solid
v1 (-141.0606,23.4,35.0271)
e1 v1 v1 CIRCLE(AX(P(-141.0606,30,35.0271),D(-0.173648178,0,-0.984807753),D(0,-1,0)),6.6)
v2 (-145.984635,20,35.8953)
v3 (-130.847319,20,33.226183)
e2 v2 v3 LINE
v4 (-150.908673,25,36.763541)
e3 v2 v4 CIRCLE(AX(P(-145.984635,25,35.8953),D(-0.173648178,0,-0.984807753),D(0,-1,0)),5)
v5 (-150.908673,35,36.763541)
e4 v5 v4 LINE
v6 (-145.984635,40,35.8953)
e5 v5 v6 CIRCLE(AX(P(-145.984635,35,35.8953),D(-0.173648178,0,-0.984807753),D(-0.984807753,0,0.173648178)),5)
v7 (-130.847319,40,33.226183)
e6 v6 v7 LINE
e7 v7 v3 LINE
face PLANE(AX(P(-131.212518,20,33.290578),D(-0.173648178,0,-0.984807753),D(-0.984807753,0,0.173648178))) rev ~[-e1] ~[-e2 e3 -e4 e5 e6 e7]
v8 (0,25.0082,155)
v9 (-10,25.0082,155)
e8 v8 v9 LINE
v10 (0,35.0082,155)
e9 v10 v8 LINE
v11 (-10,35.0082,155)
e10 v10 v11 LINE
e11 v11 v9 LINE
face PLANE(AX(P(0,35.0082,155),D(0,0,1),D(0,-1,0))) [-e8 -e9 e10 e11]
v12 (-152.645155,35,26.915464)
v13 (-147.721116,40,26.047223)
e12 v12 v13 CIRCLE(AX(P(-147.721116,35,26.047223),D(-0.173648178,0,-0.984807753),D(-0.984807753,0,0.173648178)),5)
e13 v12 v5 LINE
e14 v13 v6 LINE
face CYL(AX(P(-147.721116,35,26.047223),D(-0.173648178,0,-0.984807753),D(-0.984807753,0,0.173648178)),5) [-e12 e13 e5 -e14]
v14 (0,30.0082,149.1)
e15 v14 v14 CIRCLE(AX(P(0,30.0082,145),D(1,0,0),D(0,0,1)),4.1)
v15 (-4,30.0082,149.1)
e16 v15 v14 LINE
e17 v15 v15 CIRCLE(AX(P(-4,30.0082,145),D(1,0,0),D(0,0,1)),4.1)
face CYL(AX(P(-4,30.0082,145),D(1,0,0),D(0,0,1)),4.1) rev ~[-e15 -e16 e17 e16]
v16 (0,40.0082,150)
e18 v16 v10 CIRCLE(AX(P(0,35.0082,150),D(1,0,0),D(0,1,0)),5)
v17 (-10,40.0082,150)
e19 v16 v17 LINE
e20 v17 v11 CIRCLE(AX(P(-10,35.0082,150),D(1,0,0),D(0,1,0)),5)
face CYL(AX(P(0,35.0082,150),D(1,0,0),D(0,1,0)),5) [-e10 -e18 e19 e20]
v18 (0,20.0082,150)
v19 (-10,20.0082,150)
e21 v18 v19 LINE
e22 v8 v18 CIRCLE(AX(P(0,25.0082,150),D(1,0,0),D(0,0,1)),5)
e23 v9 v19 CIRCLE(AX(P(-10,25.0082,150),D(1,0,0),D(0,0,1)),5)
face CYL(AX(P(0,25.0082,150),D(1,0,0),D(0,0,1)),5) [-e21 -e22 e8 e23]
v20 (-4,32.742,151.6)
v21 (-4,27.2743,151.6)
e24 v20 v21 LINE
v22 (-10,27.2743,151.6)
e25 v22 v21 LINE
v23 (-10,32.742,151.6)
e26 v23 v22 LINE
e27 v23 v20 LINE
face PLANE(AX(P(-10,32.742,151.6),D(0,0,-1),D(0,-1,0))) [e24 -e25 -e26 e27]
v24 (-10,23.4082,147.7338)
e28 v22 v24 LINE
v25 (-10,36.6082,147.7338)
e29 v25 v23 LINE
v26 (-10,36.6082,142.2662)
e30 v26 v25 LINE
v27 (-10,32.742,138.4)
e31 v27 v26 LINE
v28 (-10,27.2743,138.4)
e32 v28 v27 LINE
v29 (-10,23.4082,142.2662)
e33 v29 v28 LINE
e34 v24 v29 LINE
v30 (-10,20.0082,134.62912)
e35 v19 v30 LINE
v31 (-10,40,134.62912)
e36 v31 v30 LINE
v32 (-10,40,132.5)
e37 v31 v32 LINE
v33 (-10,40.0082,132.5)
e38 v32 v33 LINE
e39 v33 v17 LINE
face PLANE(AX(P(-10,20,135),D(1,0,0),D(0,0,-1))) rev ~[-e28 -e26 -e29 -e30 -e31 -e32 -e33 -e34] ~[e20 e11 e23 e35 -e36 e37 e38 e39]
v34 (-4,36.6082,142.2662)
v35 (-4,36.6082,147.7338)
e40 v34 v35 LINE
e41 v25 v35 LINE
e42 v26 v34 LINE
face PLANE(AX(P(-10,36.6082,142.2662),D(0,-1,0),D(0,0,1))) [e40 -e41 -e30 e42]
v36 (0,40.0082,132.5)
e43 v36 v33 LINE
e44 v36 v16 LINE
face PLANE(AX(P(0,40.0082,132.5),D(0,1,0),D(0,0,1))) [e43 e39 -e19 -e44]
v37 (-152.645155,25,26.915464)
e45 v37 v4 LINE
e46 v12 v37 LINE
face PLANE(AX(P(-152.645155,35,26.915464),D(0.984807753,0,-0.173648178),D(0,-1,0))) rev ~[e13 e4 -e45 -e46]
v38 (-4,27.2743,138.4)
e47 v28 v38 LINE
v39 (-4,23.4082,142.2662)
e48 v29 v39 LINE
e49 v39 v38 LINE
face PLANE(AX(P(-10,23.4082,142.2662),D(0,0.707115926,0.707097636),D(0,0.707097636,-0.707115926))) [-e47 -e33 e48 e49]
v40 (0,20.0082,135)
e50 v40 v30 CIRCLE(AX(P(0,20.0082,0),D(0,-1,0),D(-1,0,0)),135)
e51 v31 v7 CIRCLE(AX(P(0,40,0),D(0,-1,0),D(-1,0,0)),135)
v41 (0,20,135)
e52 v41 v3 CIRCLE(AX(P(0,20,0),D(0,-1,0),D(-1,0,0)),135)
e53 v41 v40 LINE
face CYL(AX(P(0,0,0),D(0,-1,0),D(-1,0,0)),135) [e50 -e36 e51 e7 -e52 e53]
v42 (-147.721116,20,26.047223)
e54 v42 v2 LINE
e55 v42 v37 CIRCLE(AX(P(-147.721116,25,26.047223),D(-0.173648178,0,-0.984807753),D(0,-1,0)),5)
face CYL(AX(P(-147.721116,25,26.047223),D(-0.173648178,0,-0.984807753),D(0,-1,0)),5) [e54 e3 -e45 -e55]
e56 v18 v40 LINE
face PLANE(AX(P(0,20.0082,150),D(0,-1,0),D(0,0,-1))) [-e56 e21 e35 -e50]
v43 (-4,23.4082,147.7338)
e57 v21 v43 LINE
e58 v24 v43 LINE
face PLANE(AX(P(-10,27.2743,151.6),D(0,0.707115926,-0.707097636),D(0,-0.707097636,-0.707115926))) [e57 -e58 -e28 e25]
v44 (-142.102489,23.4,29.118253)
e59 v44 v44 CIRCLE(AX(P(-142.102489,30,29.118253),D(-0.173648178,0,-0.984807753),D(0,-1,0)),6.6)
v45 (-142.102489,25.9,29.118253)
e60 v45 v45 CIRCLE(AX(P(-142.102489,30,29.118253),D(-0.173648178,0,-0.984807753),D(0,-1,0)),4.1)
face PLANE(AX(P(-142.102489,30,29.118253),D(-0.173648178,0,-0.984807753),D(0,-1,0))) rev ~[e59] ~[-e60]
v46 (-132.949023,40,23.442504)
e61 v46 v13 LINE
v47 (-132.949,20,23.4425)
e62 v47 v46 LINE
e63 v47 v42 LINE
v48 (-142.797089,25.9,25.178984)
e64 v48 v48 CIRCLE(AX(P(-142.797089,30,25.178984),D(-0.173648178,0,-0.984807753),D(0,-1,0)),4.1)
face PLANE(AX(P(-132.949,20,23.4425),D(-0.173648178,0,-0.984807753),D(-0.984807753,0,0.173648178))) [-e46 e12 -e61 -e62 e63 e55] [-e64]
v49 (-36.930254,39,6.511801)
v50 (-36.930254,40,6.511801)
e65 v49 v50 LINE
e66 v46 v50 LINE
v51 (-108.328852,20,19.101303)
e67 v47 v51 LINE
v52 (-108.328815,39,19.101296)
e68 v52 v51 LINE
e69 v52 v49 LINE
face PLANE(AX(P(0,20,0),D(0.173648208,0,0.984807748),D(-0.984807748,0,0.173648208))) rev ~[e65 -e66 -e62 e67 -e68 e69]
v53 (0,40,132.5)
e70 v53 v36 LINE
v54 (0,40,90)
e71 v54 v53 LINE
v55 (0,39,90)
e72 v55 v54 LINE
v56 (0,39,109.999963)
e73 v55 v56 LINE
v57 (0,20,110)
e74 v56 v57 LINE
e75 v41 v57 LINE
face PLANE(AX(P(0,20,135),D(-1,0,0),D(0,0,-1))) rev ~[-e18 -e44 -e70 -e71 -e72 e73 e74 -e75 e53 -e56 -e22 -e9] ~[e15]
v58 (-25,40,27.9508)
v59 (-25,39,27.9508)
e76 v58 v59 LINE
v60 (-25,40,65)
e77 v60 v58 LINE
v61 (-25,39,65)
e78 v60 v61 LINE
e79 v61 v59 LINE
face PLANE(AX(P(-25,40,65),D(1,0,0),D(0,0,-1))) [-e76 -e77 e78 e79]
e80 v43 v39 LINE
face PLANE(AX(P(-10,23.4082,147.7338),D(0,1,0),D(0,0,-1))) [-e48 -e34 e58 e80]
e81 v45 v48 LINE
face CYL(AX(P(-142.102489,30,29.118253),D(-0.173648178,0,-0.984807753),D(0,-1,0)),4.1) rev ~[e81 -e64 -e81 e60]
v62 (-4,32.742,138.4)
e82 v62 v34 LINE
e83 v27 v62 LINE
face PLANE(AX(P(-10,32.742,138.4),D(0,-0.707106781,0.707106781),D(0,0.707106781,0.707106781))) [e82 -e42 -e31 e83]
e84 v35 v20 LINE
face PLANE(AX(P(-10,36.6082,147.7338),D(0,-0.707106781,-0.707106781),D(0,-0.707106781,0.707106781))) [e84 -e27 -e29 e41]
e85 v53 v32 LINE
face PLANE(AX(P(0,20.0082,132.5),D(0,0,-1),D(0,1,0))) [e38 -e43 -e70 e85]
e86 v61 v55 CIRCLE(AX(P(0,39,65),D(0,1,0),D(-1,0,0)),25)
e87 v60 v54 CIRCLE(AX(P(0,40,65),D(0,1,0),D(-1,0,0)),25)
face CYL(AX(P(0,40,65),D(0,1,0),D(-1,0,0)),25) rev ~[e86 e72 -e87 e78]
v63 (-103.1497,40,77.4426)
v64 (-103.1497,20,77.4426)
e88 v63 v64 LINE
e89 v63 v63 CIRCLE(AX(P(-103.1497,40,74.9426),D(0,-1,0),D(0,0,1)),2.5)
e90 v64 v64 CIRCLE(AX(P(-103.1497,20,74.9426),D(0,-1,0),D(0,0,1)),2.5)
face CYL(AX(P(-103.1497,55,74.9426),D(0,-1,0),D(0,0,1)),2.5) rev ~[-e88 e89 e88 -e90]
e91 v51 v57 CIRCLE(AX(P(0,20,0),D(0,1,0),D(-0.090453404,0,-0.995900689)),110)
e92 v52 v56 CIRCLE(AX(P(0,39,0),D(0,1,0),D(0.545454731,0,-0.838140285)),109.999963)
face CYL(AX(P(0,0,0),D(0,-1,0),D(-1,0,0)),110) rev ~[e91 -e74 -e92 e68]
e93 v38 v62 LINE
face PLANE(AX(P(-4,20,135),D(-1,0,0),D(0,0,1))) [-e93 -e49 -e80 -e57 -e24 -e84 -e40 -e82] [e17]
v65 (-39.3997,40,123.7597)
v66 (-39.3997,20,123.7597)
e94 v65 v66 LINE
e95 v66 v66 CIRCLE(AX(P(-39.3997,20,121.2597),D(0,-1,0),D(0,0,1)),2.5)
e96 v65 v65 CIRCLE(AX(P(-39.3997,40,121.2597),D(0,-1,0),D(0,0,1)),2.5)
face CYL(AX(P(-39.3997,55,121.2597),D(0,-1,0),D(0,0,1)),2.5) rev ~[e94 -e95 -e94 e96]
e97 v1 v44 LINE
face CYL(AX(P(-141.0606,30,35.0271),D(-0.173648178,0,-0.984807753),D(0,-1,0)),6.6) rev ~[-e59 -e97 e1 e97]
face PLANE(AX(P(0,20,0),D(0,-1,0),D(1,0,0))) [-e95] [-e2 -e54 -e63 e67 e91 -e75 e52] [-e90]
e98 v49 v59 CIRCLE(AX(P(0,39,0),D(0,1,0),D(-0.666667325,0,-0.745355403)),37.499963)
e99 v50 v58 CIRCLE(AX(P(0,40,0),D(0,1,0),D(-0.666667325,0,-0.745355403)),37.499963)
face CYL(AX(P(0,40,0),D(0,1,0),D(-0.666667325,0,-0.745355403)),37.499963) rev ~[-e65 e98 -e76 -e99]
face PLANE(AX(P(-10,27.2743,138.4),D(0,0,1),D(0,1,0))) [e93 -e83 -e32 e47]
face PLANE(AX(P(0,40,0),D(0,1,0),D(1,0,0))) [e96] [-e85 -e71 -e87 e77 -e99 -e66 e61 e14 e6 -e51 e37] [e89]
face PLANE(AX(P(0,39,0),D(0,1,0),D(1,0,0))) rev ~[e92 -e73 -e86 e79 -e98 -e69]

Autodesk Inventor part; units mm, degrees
ref_plane "YZ Plane" through (0, 0, 0) normal (1, 0, 0) x (0, 1, 0)
ref_plane "XZ Plane" through (0, 0, 0) normal (0, 1, 0) x (-1, 0, 0)
ref_plane "XY Plane" through (0, 0, 0) normal (0, 0, 1) x (1, 0, 0)
sketch "Sketch1" plane through (0, 0, 0) normal (0, 1, 0) x (-1, 0, 0)
  circle A0 centre (0, 0) radius 135
  circle A1 centre (0, 0) radius 110
  dimension "d0" = 270
  dimension "d1" = 220
extrude "Extrusion1" add sketch "Sketch1" along normal blind 55
sketch "Sketch2" plane through (0, 0, 0) normal (0, 0, 1) x (1, 0, 0)
  circle A0 centre (0, 5) radius 18
  line L0 (135, 0) -> (-135, 0) projected
  point P0 (0, 0)
  dimension "d4" = 36
  dimension "d5" = 5
extrude "Extrusion2" cut sketch "Sketch2" against normal through all
sketch "Sketch3" plane through (0, 0, 0) normal (0, -1, 0) x (1, 0, 0)
  circle A0 centre (0, 0) radius 140
extrude "Extrusion3" cut sketch "Sketch3" against normal blind 20
sketch "Sketch4" plane through (0, 20, 0) normal (0, -1, 0) x (1, 0, 0)
  line L0 (0, 0) -> (70, 0)
  line L1 (80, -100) -> (60, -100)
  line L2 (60, -100) -> (60, 100)
  line L3 (60, 100) -> (80, 100)
  line L4 (80, 100) -> (80, -100)
  line L5 (80, -100) -> (60, 100) construction
  line L6 (60, -100) -> (80, 100) construction
  dimension "d10" = 70
  dimension "d11" = 20
  dimension "d12" = 200
extrude "Extrusion4" cut sketch "Sketch4" against normal through all
sketch "Sketch5" plane through (0, 55, 0) normal (0, 1, 0) x (1, 0, 0)
  circle A0 centre (0, 0) radius 127.5
  circle A1 centre (127.5, 0) radius 2
  circle A2 centre (103.1497, 74.9426) radius 2
  circle A3 centre (39.3997, 121.2597) radius 2
  circle A4 centre (-39.3997, 121.2597) radius 2
  circle A5 centre (-103.1497, 74.9426) radius 2
  circle A6 centre (-127.5, 0) radius 2
  circle A7 centre (-103.1497, -74.9426) radius 2
  circle A8 centre (-39.3997, -121.2597) radius 2
  circle A9 centre (39.3997, -121.2597) radius 2
  circle A10 centre (103.1497, -74.9426) radius 2
  dimension "d15" = 255
  dimension "d16" = 4
  dimension "d19" = 360
hole "Hole1" at (127.5, 55, 0) at (103.1497, 55, 74.9426) at (39.3997, 55, 121.2597) at (-39.3997, 55, 121.2597) at (-103.1497, 55, 74.9426) at (-127.5, 55, 0) at (-103.1497, 55, -74.9426) at (-39.3997, 55, -121.2597) at (39.3997, 55, -121.2597) at (103.1497, 55, -74.9426) direction (0, -1, 0) diameter 5 end through all
sketch "Sketch6" plane through (0, 55, 0) normal (0, 1, 0) x (1, 0, 0)
  circle A0 centre (0, 0) radius 140
extrude "Extrusion5" cut sketch "Sketch6" against normal blind 15
sketch "Sketch7" plane through (0, 40, 0) normal (0, 1, 0) x (1, 0, 0)
  circle A0 centre (0, 0) radius 140
  line L0 (80, -100) -> (80, -75.4983) projected
  line L1 (80, -100) -> (80, -75.4983)
  line L2 (60, -100) -> (80, -100) projected
  line L3 (80, -100) -> (60, -100)
  line L4 (60, -100) -> (60, -92.1954)
  line L5 (60, 100) -> (60, 92.1954) projected
  line L6 (60, 92.1954) -> (60, 100)
  line L7 (60, 100) -> (80, 100)
  line L8 (80, 100) -> (80, 75.4983)
  arc A1 (80, -75.4983) -> (80, 75.4983) centre (0, 0) ccw
  arc A2 (60, 92.1954) -> (60, -92.1954) centre (0, 0) ccw
  arc A3 (-25, -65) -> (25, -65) centre (0, -65) ccw
  arc A4 (25, 65) -> (-25, 65) centre (0, 65) ccw
  arc A5 (25, -27.9508) -> (25, 27.9508) centre (0, 0) ccw
  arc A6 (-25, 27.9508) -> (-25, -27.9508) centre (0, 0) ccw
  line L9 (25, 65) -> (25, 27.9508)
  line L10 (25, -27.9508) -> (25, -65)
  line L11 (-25, -65) -> (-25, -27.9508)
  line L12 (-25, 27.9508) -> (-25, 65)
extrude "Extrusion6" add sketch "Sketch7" against normal blind 1 contours L2 L4 A2 L5 L7 L8 A1 L0
sketch "Sketch8" plane through (0, 39, 0) normal (0, -1, 0) x (1, 0, 0)
  line L0 (80, -75.4983) -> (80, -100) projected
  line L1 (80, -100) -> (60, -100)
  line L2 (60, -100) -> (60, 100)
  line L3 (60, 100) -> (80, 100)
  line L4 (80, 100) -> (80, 75.4983)
  line L5 (80, -75.4983) -> (80, -100)
  arc A0 (80, -75.4983) -> (80, 75.4983) centre (0, 0) ccw
  arc A1 (60, 92.1954) -> (60, -92.1954) centre (0, 0) ccw
extrude "Extrusion7" add sketch "Sketch8" along normal blind 14 contours L0 L1 L2 L3 L4 A0
sketch "Sketch9" plane through (0, 20, 0) normal (0, -1, 0) x (1, 0, 0)
  arc A0 (9.9499, -134.6328) -> (-9.9499, -134.6328) centre (0, 0) ccw projected
  spline S0 degree 7 poles (9.9499, -134.6328) (9.4556, -134.6694) (8.9421, -134.7052) (8.4096, -134.74) (7.8582, -134.7735) (7.2882, -134.8052) (6.6998, -134.835) (5.2633, -134.8999) (4.3998, -134.933) (3.5087, -134.9604) (2.5962, -134.9814) (1.6691, -134.9951) (0.7345, -135.0012) (-1.7136, -134.9976) (-3.2083, -134.9756) (-4.6621, -134.9347) (-6.0536, -134.8776) (-7.364, -134.8084) (-8.5782, -134.7318) (-9.7236, -134.6494) (-9.7616, -134.6466) (-9.7995, -134.6439) (-9.8372, -134.6411) (-9.8749, -134.6384) (-9.9124, -134.6356) (-9.9499, -134.6328) knots 0 0 0 0 0 0 0 0 0.214533 0.214533 0.214533 0.214533 0.214533 0.214533 0.508291 0.508291 0.508291 0.508291 0.508291 0.508291 0.983641 0.983641 0.983641 0.983641 0.983641 0.983641 1 1 1 1 1 1 1 1 projected
  line L0 (0, 135) -> (0, -135)
  line L1 (132.949, -23.4425) -> (-132.949, 23.4425)
  point P0 (0, 0)
  dimension "d40" = 80
extrude "Extrusion8" cut sketch "Sketch9" against normal through all contours S0 L0 L1 A0 | L1 L0 A0 | S0 A0 L1 L0 picked at (5.2242, 89.6957)
sketch "Sketch10" plane through (-132.949, 20, 23.4425) normal (-0.1736482, 0, -0.9848078) x (-0.9848078, 0, 0.1736482)
  line L0 (-111.5575, 20) -> (0, 20) projected
  line L1 (-2.5, 20) -> (15, 20)
  line L2 (20, 15) -> (20, 5)
  line L3 (15, 0) -> (-2.5, 0)
  line L4 (-2.5, 0) -> (-2.5, 20)
  line L5 (0, 20) -> (0, 0) projected
  arc A0 (20, 15) -> (15, 20) centre (15, 15) ccw
  arc A1 (15, 0) -> (20, 5) centre (15, 5) ccw
  point P0 (-135, -20)
  point P1 (20, 0)
  point P2 (20, 20)
  dimension "d43" = 22.5
  dimension "d44" = 20
  dimension "d45" = 20
  dimension "d46" = 5
extrude "Extrusion9" add sketch "Sketch10" against normal blind 10
sketch "Sketch11" plane through (0, 20, 135) normal (1, 0, 0) x (0, 0, -1)
  line L0 (2.5, 20.0082) -> (-15, 20.0082)
  line L1 (-20, 15.0082) -> (-20, 5.0082)
  line L2 (-15, 0.0082) -> (2.5, 0.0082)
  line L3 (2.5, 0.0082) -> (2.5, 20.0082)
  line L4 (0, 0) -> (0, 20) projected
  arc A0 (-15, 20.0082) -> (-20, 15.0082) centre (-15, 15.0082) ccw
  arc A1 (-20, 5.0082) -> (-15, 0.0082) centre (-15, 5.0082) ccw
  point P0 (135, -20)
  point P1 (-20, 0.0082)
  point P2 (-20, 20.0082)
  dimension "d50" = 22.5
  dimension "d51" = 20
  dimension "d52" = 20
  dimension "d53" = 5
extrude "Extrusion10" add sketch "Sketch11" against normal blind 10
sketch "Sketch12" plane through (-131.2126, 20, 33.2906) normal (0.1736482, 0, 0.9848078) x (0.9848078, 0, -0.1736482)
  line L0 (-15, 0) -> (0.3709, 0) projected
  line L1 (-20, 15) -> (-20, 5) projected
  point P0 (135, -20)
  point P1 (-10, 10)
  dimension "d58" = 10
  dimension "d59" = 10
hole "Hole2" at (-141.0606, 30, 35.0271) direction (-0.1736482, 0, -0.9848078) diameter 8.2 end through all counterbore diameter 13.2 counterbore depth 6
sketch "Sketch13" plane through (-10, 20, 135) normal (-1, 0, 0) x (0, 0, 1)
  line L0 (7.2662, 3.4082) -> (3.4, 7.2743)
  line L1 (3.4, 7.2743) -> (3.4, 12.742)
  line L2 (3.4, 12.742) -> (7.2662, 16.6082)
  line L3 (7.2662, 16.6082) -> (12.7338, 16.6082)
  line L4 (12.7338, 16.6082) -> (16.6, 12.742)
  line L5 (16.6, 12.742) -> (16.6, 7.2743)
  line L6 (16.6, 7.2743) -> (12.7338, 3.4082)
  line L7 (12.7338, 3.4082) -> (7.2662, 3.4082)
  line L8 (-0.3709, 0.0082) -> (15, 0.0082) projected
  line L9 (20, 5.0082) -> (20, 15.0082) projected
  point P0 (-135, -20)
  point P1 (10, 10.0082)
  dimension "d67" = 10
  dimension "d68" = 10
  dimension "d69" = 13.2
extrude "Extrusion11" cut sketch "Sketch13" against normal blind 6
sketch "Sketch14" plane through (-4, 20, 135) normal (-1, 0, 0) x (0, 0, 1)
  line L0 (15, 0.0082) -> (0, 0.0082) projected
  line L1 (20, 15.0082) -> (20, 5.0082) projected
  point P0 (-135, -20)
  point P1 (10, 10.0082)
  dimension "d72" = 10
  dimension "d73" = 10
hole "Hole3" at (-4, 30.0082, 145) direction (1, 0, 0) diameter 8.2 end through all
properties part number "Cylinder Spacer Top_Q4"
